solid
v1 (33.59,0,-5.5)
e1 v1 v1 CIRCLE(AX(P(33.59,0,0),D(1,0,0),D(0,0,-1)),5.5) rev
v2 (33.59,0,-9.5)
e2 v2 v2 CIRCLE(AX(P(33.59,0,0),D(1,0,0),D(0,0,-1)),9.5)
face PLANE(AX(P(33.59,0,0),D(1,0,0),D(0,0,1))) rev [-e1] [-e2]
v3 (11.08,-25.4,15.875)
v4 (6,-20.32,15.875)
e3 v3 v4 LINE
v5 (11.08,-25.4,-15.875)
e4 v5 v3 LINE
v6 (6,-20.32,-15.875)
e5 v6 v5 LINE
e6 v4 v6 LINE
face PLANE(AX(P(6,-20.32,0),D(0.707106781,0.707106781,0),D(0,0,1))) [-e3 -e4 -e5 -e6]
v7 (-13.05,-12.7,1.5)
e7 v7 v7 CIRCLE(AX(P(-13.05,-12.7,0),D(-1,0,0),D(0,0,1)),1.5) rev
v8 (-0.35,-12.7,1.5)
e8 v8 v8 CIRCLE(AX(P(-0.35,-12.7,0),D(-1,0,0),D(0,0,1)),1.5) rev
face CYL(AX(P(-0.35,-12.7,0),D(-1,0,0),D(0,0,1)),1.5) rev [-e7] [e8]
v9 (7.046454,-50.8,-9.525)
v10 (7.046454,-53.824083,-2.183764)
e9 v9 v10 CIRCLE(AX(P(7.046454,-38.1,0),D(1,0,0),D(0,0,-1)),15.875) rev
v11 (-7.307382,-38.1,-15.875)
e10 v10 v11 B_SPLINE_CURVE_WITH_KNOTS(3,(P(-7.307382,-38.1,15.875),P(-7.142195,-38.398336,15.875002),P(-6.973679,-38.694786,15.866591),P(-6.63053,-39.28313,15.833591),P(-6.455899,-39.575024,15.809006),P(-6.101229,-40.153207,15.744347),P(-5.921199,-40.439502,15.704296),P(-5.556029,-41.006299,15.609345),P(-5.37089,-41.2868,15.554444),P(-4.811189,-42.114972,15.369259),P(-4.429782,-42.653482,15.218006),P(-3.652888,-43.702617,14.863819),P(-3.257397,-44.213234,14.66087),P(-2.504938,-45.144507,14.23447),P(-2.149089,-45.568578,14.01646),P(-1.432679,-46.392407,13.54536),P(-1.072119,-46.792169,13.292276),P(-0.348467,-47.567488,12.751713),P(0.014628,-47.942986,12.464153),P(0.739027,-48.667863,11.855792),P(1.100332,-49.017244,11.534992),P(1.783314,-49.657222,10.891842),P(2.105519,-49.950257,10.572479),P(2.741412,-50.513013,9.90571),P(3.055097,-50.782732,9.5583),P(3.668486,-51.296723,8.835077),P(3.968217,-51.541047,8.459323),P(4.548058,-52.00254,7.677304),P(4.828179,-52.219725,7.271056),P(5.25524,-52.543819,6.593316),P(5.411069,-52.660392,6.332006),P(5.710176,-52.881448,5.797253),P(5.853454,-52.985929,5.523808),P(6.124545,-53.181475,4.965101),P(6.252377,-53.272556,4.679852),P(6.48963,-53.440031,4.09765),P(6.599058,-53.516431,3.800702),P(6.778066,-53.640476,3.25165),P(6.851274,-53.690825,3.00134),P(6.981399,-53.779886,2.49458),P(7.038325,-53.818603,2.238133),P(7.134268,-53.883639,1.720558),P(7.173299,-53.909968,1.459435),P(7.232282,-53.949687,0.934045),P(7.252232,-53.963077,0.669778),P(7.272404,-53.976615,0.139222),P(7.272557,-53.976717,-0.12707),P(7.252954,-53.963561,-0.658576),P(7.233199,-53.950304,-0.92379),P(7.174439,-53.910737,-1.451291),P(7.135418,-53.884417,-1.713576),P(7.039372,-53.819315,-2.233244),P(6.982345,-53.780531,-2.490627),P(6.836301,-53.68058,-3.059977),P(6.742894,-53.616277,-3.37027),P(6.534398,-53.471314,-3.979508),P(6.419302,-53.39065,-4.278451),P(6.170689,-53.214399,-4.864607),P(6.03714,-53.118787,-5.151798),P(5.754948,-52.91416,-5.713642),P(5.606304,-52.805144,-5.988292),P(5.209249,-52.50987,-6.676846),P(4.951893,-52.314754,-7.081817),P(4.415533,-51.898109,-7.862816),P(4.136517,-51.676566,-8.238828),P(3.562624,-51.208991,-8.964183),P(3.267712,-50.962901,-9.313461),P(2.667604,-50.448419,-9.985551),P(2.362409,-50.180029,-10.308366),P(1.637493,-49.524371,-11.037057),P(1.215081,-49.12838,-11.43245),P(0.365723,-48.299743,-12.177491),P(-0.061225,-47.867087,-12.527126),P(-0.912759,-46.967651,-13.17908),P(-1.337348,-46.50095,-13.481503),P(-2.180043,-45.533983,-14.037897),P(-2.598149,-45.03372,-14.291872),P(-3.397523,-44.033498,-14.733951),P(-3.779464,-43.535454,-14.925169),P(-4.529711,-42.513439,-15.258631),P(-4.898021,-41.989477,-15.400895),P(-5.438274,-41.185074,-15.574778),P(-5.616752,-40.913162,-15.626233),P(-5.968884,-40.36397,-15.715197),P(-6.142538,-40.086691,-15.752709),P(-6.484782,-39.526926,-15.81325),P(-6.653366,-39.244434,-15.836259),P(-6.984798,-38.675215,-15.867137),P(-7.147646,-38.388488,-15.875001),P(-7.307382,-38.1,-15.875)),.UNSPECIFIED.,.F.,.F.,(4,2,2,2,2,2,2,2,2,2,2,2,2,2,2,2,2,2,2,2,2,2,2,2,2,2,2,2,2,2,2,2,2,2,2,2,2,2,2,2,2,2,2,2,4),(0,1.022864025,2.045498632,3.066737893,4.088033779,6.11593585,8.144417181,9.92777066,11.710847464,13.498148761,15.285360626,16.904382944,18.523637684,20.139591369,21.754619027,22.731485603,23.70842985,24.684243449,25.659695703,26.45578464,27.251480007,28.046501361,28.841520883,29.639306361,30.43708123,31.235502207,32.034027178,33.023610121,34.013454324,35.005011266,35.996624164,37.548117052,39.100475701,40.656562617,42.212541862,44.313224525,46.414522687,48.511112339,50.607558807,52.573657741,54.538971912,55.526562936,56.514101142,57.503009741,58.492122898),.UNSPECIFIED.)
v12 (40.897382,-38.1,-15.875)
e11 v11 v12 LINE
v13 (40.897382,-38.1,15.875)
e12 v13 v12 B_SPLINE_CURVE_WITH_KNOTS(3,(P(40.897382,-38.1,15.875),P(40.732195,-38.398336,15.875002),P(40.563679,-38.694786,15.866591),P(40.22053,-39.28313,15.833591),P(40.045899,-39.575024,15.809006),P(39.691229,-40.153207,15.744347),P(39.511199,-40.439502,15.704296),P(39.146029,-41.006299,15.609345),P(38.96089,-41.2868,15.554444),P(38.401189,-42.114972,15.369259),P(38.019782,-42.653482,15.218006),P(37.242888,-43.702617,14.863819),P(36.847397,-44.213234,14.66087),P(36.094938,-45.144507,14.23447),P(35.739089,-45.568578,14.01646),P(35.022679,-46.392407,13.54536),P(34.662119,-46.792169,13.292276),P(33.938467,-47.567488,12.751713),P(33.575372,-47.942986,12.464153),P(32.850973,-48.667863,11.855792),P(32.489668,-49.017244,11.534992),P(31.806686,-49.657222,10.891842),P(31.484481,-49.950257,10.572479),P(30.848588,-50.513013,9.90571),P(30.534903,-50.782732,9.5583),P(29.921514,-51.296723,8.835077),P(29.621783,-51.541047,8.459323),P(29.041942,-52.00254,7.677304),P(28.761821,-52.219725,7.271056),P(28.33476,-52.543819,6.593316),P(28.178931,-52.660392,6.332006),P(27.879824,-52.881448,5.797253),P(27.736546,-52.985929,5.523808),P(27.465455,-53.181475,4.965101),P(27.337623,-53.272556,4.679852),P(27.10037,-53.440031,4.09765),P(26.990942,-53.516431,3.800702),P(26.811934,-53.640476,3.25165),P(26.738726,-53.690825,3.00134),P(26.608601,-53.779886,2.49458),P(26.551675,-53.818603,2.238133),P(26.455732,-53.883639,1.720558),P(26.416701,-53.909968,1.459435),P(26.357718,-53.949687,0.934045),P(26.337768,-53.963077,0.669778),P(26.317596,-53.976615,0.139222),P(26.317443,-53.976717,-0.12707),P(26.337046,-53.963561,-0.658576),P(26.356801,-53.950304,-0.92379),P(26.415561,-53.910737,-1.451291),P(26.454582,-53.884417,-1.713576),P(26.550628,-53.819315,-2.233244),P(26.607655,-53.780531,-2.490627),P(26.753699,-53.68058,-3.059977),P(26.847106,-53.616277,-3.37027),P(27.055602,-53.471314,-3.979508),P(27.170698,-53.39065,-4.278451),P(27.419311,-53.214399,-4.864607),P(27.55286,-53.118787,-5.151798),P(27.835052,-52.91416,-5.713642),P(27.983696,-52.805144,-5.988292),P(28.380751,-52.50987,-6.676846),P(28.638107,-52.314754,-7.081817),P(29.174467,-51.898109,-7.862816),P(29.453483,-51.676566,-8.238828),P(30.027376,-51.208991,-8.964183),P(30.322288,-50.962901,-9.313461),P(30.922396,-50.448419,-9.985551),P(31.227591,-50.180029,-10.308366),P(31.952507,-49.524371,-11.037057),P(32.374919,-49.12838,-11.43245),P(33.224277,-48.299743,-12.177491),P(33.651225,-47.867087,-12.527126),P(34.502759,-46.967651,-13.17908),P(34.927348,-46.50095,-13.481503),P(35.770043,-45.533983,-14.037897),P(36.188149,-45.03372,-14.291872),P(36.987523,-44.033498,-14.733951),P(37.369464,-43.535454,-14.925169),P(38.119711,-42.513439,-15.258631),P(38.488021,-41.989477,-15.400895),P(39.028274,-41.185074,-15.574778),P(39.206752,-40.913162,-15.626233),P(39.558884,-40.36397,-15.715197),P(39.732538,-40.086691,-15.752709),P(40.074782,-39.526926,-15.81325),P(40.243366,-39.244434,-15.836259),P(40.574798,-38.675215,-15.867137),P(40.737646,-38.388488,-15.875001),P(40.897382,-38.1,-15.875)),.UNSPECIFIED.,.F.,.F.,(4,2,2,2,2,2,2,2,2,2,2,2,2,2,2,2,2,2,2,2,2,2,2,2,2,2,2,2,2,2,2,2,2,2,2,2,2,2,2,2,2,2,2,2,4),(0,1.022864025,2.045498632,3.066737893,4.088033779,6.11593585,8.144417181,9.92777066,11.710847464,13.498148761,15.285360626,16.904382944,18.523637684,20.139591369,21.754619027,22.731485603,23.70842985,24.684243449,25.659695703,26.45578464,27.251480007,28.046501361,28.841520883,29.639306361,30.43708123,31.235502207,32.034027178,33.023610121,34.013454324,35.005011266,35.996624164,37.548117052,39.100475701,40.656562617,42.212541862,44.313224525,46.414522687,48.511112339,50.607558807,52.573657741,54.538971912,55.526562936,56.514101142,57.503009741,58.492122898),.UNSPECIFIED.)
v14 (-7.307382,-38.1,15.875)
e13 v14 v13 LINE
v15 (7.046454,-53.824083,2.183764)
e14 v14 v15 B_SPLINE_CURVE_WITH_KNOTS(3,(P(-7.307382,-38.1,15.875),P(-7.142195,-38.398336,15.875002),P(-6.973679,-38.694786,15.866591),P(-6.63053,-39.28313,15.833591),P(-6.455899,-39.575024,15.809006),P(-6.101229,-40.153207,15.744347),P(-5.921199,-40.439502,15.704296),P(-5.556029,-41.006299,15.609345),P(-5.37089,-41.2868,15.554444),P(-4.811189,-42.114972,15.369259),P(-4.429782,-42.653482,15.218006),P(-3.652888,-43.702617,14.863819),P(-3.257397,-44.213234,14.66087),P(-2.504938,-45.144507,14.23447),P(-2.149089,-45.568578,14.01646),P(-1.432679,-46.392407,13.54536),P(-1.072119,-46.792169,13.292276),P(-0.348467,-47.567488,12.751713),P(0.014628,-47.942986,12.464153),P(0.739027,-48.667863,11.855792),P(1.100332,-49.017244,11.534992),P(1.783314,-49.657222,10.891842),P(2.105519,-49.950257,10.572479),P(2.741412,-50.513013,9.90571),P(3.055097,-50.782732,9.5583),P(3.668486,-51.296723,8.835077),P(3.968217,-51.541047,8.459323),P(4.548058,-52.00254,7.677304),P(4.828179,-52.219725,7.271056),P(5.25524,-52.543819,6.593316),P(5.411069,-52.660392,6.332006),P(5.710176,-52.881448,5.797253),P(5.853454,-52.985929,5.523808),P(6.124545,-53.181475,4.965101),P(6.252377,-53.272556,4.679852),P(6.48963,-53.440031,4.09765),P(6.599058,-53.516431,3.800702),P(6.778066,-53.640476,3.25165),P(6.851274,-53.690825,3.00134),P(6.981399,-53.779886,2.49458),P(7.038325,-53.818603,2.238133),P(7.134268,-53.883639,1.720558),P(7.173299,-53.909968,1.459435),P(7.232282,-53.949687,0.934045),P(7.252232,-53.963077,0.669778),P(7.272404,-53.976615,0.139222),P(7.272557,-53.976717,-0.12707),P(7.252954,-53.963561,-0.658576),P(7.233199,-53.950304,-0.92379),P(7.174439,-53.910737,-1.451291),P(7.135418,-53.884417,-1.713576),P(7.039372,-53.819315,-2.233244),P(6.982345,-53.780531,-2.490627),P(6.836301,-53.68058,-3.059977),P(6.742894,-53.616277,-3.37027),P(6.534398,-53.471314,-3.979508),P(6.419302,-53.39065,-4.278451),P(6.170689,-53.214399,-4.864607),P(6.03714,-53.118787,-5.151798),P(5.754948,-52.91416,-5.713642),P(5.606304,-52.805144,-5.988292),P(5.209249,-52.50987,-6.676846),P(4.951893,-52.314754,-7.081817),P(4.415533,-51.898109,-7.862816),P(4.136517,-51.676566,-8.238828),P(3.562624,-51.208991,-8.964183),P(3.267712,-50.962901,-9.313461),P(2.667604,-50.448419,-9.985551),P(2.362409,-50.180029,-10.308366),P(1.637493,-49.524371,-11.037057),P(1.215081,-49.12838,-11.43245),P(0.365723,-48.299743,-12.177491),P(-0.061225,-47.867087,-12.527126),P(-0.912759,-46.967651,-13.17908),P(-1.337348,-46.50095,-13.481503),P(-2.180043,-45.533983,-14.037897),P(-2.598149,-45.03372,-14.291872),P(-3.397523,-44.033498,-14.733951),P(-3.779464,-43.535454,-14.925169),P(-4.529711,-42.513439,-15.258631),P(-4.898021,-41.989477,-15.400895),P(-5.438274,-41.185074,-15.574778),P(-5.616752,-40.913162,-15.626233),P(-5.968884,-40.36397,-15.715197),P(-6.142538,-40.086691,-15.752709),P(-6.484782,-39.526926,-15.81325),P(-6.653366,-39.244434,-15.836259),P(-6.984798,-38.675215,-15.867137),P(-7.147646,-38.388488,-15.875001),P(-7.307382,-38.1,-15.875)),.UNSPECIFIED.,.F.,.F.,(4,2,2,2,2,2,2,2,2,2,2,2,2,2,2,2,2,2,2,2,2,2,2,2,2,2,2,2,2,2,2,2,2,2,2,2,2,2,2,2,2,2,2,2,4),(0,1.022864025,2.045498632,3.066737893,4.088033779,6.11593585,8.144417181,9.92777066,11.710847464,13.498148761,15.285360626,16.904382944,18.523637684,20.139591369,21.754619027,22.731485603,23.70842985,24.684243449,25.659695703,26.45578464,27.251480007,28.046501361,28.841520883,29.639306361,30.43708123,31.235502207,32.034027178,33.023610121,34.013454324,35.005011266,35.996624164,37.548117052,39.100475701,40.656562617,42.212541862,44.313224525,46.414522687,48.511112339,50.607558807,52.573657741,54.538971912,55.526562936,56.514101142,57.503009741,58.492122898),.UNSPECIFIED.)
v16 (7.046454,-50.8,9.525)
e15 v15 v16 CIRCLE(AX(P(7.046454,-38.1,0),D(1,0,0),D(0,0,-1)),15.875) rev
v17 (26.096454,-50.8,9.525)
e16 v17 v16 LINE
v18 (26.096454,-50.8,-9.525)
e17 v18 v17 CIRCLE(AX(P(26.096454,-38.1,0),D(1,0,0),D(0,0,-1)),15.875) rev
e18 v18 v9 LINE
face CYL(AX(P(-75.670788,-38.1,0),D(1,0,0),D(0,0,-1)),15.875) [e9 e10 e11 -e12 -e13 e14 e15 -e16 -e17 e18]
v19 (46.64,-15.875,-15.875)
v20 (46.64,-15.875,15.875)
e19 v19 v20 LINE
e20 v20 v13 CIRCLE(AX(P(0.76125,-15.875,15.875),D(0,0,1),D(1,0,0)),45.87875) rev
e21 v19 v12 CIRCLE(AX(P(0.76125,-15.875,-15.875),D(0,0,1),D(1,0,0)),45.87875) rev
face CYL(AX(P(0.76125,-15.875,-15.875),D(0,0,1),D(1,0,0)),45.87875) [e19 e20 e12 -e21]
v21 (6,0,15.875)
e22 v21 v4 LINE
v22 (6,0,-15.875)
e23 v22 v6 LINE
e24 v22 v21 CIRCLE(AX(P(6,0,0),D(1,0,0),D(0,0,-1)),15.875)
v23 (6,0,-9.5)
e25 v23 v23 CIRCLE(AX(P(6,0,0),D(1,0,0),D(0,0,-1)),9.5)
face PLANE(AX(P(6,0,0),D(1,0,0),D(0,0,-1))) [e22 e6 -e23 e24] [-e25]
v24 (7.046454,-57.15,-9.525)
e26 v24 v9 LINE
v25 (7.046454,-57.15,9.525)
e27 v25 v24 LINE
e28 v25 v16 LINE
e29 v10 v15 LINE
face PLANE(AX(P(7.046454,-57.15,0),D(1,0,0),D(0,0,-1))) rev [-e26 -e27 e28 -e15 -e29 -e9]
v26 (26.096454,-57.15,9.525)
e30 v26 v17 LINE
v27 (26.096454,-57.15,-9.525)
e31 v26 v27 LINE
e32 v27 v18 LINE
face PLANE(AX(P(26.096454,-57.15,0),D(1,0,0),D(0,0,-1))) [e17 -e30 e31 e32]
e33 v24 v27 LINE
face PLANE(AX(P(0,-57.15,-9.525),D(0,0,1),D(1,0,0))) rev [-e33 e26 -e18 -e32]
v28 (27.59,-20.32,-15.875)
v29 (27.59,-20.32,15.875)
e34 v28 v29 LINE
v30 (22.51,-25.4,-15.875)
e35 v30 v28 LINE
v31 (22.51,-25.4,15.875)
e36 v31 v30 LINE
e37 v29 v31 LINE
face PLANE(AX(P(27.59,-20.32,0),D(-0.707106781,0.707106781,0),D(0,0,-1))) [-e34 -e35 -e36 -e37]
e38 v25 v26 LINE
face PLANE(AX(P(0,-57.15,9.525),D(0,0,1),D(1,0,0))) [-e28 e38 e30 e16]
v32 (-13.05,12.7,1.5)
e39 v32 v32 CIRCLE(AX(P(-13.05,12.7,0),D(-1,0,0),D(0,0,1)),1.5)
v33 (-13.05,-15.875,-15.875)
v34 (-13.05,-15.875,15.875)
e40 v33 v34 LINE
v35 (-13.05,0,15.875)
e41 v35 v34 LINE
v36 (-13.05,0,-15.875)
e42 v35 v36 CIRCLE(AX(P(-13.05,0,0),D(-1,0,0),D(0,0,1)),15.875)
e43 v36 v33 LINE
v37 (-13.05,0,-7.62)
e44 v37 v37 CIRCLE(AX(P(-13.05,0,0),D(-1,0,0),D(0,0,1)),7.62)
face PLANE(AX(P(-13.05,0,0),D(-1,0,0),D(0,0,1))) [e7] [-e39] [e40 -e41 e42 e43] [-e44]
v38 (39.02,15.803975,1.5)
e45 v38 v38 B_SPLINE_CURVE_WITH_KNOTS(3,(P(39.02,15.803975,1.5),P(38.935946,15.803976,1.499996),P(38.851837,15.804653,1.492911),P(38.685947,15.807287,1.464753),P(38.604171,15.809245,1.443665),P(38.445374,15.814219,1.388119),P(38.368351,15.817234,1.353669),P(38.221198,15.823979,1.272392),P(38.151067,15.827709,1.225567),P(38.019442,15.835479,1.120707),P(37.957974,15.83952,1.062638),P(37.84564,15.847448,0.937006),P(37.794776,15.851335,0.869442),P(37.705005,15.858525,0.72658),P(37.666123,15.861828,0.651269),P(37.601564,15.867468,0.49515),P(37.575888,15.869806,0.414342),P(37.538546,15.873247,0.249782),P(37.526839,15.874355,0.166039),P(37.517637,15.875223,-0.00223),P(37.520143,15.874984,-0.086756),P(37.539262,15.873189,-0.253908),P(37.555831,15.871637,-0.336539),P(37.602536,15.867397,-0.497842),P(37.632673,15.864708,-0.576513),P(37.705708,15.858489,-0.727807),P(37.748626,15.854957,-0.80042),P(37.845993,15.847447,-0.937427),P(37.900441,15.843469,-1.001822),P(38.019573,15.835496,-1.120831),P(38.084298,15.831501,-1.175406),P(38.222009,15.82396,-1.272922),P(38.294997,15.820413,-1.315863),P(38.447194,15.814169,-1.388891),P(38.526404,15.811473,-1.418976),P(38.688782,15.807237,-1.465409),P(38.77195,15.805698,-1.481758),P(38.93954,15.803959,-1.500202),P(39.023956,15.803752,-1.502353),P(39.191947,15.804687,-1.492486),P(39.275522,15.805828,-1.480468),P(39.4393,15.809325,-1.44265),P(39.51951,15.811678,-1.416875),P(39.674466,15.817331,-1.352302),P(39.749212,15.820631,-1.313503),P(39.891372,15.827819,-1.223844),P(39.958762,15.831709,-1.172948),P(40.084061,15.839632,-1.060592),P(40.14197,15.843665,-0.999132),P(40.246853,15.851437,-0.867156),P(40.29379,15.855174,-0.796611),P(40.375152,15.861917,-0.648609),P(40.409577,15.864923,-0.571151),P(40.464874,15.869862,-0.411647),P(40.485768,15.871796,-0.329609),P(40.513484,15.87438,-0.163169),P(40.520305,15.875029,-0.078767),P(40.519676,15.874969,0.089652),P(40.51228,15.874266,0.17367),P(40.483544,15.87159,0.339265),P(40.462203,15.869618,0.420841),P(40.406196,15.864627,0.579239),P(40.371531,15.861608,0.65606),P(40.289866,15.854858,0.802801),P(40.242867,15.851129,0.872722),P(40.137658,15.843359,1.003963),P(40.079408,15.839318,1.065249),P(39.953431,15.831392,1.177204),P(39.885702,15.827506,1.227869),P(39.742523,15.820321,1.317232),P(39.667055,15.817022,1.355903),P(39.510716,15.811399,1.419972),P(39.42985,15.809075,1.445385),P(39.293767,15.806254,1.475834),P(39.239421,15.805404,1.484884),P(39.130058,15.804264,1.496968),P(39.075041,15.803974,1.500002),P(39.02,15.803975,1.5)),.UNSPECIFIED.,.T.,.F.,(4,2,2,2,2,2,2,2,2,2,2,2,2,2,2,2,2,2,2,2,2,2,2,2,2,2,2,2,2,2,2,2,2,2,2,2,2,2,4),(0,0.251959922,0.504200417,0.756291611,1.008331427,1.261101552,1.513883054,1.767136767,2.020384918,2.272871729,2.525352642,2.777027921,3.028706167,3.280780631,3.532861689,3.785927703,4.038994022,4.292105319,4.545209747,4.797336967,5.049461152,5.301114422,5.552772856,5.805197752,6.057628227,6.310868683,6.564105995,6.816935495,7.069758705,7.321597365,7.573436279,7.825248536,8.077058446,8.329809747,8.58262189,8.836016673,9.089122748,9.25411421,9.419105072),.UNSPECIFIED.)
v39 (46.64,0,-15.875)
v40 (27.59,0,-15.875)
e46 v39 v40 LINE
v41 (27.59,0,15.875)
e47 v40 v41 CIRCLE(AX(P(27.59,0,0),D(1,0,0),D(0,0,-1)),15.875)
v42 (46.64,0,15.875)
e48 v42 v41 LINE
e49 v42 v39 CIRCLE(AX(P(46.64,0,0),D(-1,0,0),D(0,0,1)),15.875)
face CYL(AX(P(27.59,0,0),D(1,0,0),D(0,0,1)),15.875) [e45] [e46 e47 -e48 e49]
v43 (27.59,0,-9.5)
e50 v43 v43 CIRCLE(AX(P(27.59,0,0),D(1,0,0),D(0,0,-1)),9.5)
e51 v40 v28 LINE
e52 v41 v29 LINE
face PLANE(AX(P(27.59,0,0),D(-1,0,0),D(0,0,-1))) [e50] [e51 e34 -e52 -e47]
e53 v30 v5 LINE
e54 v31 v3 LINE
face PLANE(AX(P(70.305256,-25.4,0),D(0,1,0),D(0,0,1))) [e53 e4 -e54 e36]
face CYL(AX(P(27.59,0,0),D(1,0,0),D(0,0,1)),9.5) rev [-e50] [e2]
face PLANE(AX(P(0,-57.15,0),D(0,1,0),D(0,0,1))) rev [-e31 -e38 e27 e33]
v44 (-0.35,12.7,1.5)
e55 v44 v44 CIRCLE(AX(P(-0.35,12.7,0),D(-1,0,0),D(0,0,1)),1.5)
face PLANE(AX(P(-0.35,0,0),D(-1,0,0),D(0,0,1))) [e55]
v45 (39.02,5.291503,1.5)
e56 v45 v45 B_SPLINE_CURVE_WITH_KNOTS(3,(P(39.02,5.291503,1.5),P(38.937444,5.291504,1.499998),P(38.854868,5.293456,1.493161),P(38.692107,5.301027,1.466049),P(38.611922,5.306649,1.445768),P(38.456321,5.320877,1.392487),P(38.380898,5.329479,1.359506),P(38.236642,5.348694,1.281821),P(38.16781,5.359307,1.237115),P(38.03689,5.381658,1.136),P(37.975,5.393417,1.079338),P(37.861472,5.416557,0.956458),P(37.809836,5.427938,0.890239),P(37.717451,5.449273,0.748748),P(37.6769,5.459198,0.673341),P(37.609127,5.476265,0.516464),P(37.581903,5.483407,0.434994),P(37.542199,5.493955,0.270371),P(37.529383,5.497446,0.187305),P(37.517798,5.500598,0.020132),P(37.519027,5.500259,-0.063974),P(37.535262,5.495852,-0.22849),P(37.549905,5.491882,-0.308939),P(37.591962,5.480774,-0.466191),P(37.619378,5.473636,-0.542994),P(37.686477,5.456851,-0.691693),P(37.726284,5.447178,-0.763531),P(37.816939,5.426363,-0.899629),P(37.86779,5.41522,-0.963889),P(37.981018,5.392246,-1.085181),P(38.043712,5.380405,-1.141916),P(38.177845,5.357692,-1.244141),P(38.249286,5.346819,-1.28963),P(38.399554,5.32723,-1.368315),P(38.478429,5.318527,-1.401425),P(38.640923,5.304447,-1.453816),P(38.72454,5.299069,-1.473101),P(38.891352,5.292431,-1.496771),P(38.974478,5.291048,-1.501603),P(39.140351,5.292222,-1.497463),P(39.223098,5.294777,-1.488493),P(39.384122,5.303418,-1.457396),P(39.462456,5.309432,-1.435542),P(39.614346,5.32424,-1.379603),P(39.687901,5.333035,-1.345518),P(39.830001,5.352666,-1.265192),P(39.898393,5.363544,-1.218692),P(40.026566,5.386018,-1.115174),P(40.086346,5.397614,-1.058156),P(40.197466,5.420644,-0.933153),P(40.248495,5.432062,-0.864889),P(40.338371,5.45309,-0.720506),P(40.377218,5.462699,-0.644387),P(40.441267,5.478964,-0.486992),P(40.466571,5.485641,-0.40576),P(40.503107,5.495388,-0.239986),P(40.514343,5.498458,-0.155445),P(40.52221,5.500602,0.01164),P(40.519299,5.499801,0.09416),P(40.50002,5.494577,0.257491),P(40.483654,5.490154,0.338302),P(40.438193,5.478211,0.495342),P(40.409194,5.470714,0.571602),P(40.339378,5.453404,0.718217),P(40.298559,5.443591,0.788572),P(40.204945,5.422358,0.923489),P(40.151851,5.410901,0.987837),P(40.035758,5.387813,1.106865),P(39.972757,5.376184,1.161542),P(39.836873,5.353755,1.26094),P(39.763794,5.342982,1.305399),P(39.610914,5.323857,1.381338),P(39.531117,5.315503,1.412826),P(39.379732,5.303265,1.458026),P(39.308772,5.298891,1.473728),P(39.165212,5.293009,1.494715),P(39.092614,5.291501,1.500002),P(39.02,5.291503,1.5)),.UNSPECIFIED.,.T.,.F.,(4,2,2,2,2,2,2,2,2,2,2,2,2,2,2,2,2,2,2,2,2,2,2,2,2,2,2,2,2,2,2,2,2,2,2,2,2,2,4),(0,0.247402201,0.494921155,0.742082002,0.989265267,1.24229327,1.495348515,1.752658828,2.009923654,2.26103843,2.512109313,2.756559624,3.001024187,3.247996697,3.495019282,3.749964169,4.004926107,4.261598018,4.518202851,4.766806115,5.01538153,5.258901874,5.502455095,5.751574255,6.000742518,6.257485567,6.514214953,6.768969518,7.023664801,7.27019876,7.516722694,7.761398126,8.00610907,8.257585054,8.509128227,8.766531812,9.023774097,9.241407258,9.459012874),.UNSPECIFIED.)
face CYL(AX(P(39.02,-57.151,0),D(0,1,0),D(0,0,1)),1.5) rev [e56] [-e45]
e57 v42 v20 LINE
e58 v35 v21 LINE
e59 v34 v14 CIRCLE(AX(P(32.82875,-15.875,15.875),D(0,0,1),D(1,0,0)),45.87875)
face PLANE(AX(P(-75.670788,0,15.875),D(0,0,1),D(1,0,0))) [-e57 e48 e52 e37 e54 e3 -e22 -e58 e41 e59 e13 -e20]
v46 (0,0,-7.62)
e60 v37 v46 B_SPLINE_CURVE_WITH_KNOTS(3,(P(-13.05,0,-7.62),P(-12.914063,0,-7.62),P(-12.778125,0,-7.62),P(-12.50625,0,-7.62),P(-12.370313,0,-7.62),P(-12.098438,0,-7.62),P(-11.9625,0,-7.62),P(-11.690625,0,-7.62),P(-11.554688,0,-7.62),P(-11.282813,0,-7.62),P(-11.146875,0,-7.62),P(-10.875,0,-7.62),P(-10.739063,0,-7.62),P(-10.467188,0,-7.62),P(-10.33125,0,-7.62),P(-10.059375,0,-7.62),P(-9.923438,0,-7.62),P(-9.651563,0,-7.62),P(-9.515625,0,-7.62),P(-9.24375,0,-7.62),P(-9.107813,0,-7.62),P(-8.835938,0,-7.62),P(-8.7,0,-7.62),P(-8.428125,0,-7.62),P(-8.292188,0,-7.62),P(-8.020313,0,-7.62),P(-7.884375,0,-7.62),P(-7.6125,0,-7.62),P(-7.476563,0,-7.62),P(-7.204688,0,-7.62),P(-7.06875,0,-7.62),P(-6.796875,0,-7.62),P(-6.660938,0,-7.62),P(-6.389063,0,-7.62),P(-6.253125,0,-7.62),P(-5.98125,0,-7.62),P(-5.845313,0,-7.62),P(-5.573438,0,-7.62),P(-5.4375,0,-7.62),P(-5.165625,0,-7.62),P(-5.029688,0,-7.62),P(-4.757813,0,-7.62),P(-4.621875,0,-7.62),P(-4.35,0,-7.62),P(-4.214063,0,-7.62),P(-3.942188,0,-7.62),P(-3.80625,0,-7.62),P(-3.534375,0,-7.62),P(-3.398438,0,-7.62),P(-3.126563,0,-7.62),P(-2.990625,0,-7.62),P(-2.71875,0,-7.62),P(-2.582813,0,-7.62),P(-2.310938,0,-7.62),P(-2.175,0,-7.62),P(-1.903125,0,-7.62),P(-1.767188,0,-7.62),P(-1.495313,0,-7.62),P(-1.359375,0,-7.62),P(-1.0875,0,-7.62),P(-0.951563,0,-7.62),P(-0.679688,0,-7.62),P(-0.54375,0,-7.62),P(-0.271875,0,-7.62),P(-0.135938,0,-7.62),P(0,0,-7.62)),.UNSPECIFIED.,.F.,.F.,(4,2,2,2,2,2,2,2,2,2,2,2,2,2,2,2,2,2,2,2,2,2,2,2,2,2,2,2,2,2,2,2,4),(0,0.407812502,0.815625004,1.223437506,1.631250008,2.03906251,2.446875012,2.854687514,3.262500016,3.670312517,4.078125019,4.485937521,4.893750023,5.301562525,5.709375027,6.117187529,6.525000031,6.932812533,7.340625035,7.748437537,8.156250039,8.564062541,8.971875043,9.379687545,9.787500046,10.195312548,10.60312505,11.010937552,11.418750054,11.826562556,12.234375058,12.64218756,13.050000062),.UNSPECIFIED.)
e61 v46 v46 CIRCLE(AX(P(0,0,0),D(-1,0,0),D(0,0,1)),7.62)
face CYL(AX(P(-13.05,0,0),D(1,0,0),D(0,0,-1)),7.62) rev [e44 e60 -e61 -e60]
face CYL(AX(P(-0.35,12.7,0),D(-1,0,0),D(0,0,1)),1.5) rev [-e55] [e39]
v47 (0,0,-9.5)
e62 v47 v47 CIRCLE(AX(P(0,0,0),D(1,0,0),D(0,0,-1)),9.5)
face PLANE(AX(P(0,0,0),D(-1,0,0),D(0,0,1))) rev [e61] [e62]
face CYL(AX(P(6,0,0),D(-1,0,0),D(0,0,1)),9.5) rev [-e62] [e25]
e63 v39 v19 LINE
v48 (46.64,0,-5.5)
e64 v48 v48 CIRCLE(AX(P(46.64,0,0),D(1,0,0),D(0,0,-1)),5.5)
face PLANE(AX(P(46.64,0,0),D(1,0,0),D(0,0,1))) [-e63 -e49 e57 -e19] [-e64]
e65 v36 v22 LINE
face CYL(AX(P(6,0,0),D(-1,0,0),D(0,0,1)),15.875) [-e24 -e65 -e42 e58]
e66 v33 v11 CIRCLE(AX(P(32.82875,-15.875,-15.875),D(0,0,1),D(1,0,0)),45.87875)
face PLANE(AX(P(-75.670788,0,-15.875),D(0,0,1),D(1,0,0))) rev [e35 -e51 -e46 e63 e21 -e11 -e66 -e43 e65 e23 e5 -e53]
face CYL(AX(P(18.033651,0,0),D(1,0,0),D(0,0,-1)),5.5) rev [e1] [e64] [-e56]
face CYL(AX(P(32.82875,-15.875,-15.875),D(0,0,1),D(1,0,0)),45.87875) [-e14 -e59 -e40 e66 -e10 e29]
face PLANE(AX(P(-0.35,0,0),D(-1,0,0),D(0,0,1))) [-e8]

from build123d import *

# Parameters (mm, degrees)
SKETCH1_R               = 15.875
SKETCH1_R_2             = 9.5
BOSS_EXTRUDE1_DEPTH     = 6
BOSS_EXTRUDE2_START     = 13.050000062
SKETCH2_R               = 15.875
SKETCH2_R_2             = 9.5
SKETCH2_R_3             = 7.62
BOSS_EXTRUDE2_DEPTH     = 13.050000062
BOSS_EXTRUDE3_START     = -19.050000062
BOSS_EXTRUDE3_DEPTH     = 19.050000062
BOSS_EXTRUDE4_START     = 21.59
BOSS_EXTRUDE4_DEPTH     = 19.050000062
BOSS_EXTRUDE5_REACH     = 71.404
CUT_EXTRUDE1_START      = -31.75
CUT_EXTRUDE1_DEPTH      = 31.75
SKETCH9_W               = 19.05
SKETCH9_H               = 19.05
BOSS_EXTRUDE8_DEPTH     = 31.75
CHAMFER1_SIZE           = 5.08
SKETCH6_R               = 7.62
SKETCH6_R_2             = 5.25
BOSS_EXTRUDE6_DEPTH     = 13.050000062
SKETCH7_R               = 1.5
CUT_EXTRUDE2_DEPTH      = 12.7
CUT_EXTRUDE3_REACH      = 90.091
CUT_EXTRUDE3_END_RADIUS = 5.25
SKETCH8_R               = 1.5
CUT_EXTRUDE4_REACH      = 86.149
SKETCH10_R              = 5.5
SKETCH10_R_2            = 5.25


# Read off the part's stored shape, not the designer's step: Cut-Extrude1
with BuildPart() as part:
    # Sketch1 → Boss-Extrude1 (new body)
    with BuildSketch(Plane(origin=(0, 0, 0), x_dir=(0, 0, -1), z_dir=(1, 0, 0))):
        Circle(SKETCH1_R)
        Circle(SKETCH1_R_2, mode=Mode.SUBTRACT)
    extrude(amount=BOSS_EXTRUDE1_DEPTH)

    # Sketch2 → Boss-Extrude2 (add)
    # profile 1 of 2: a face of its own
    with BuildSketch(Plane.ZY.offset(BOSS_EXTRUDE2_START)):
        Circle(SKETCH2_R)
        with Locations(Location((0, 0, 0), (0, 0, 180))):
            Circle(SKETCH2_R_2, mode=Mode.SUBTRACT)
    # profile 2 of 2: a face of its own
    with BuildSketch(Plane.ZY.offset(BOSS_EXTRUDE2_START)):
        with Locations(Location((0, 0, 0), (0, 0, 180))):
            Circle(SKETCH2_R_2)
        with Locations(Location((0, 0, 0), (0, 0, 180))):
            Circle(SKETCH2_R_3, mode=Mode.SUBTRACT)
    extrude(amount=-BOSS_EXTRUDE2_DEPTH)


with BuildPart() as body_2:
    # Mirror2: mirrored copy
    add(part.part.mirror(Plane(origin=(16.795, 0, 0), x_dir=(0, 0, 1), z_dir=(1, 0, 0))))

    # Sketch3<3> → Boss-Extrude4 (add)
    with BuildSketch(Plane(origin=(6, 0, 0), x_dir=(0, 0, -1), z_dir=(1, 0, 0)).offset(BOSS_EXTRUDE4_START)):
        with BuildLine():
            ThreePointArc((15.875, 0), (0, -15.875), (-15.875, 0))
            Line((-15.875, 0), (-15.875, -38.1))
            ThreePointArc((-15.875, -38.1), (0, -53.975), (15.875, -38.1))
            Line((15.875, -38.1), (15.875, 0))
        make_face()
    extrude(amount=BOSS_EXTRUDE4_DEPTH)

    # Sketch4 → Boss-Extrude5 (add, up to next)
    with BuildSketch(Plane(origin=(6, 0, 0), x_dir=(0, 0, -1), z_dir=(1, 0, 0)), mode=Mode.PRIVATE) as boss_extrude5_sk1:
        with BuildLine():
            Line((15.875, -25.4), (-15.875, -25.4))
            Line((-15.875, -25.4), (-15.875, -38.1))
            ThreePointArc((-15.875, -38.1), (0, -53.975), (15.875, -38.1))
            Line((15.875, -38.1), (15.875, -25.4))
        make_face()
    boss_extrude5_tool1 = extrude(boss_extrude5_sk1.sketch, amount=BOSS_EXTRUDE5_REACH, mode=Mode.PRIVATE) - body_2.part


with BuildPart() as part_1:
    add(part.part)

    # Sketch3 → Boss-Extrude3 (add)
    with BuildSketch(Plane(origin=(6, 0, 0), x_dir=(0, 0, -1), z_dir=(1, 0, 0)).offset(BOSS_EXTRUDE3_START)):
        with BuildLine():
            ThreePointArc((15.875, 0), (0, -15.875), (-15.875, 0))
            Line((-15.875, 0), (-15.875, -38.1))
            ThreePointArc((-15.875, -38.1), (0, -53.975), (15.875, -38.1))
            Line((15.875, -38.1), (15.875, 0))
        make_face()
    extrude(amount=BOSS_EXTRUDE3_DEPTH)


with BuildPart() as body_2_1:
    add(body_2.part)

    add(part_1.part)  # Boss-Extrude5 merges part
    add(boss_extrude5_tool1.solids().sort_by_distance((6, -38.23351, 0))[0])

    # Cut-Extrude1 outline → Cut-Extrude1 (cut)
    with BuildSketch(Plane.XY.offset(15.875).offset(CUT_EXTRUDE1_START)):
        with BuildLine():
            Line((-13.050000062, -15.875), (-13.050000062, -53.975))
            Line((-13.050000062, -53.975), (7.27, -53.975))
            ThreePointArc((7.27, -53.975), (-7.652500044, -37.465000015), (-13.050000062, -15.875))
        make_face()
        with BuildLine():
            ThreePointArc((46.640000062, -15.875), (41.242500044, -37.465000015), (26.32, -53.975))
            Line((26.32, -53.975), (46.640000062, -53.975))
            Line((46.640000062, -53.975), (46.640000062, -15.875))
        make_face()
    extrude(amount=CUT_EXTRUDE1_DEPTH, mode=Mode.SUBTRACT)

    # Sketch9 → Boss-Extrude8 (add)
    with BuildSketch(Plane(origin=(0, -25.4, 0), x_dir=(1, 0, 0), z_dir=(0, 1, 0))):
        with Locations((16.571454424, 0)):
            Rectangle(SKETCH9_W, SKETCH9_H)
    extrude(amount=-BOSS_EXTRUDE8_DEPTH)

    # Chamfer1
    chamfer1_edges = [body_2_1.edges().sort_by_distance(p)[0] for p in [
        (6, -25.4, 0),
        (27.59, -25.4, 0),
    ]]
    chamfer(chamfer1_edges, length=CHAMFER1_SIZE)

    # Sketch6 → Boss-Extrude6 (add)
    with BuildSketch(Plane(origin=(46.640000062, 0, 0), x_dir=(0, 0, -1), z_dir=(1, 0, 0))):
        Circle(SKETCH6_R)
        Circle(SKETCH6_R_2, mode=Mode.SUBTRACT)
    extrude(amount=-BOSS_EXTRUDE6_DEPTH)

    # Sketch7 → Cut-Extrude2 (cut)
    with BuildSketch(Plane.ZY.offset(13.050000062)):
        with Locations((0, 12.7)):
            Circle(SKETCH7_R)
        with Locations((0, -12.7)):
            Circle(SKETCH7_R)
    extrude(amount=-CUT_EXTRUDE2_DEPTH, mode=Mode.SUBTRACT)

    # Cut-Extrude3: up to this cylinder (the profile starts outside it)
    cut_extrude3_end = Plane(origin=(39.02, 0, 0), z_dir=(1, 0, 0)) * Cylinder(CUT_EXTRUDE3_END_RADIUS, 191.682, mode=Mode.PRIVATE)
    # Sketch8 → Cut-Extrude3 (cut, up to the surface)
    with BuildSketch(Plane(origin=(0, 15.875, 0), x_dir=(1, 0, 0), z_dir=(0, 1, 0)), mode=Mode.PRIVATE) as cut_extrude3_sk1:
        with Locations(Location((39.020000062, 0, 0), (0, 0, 270))):
            Circle(SKETCH8_R)
    cut_extrude3_tool1 = extrude(cut_extrude3_sk1.sketch, amount=-CUT_EXTRUDE3_REACH, mode=Mode.PRIVATE) - cut_extrude3_end
    add(cut_extrude3_tool1.solids().sort_by_distance((39.02, 15.875, 0))[0], mode=Mode.SUBTRACT)

    # Cut-Extrude4: up to this face of the body (flat: up to its plane)
    cut_extrude4_end = Plane(body_2_1.part.faces().sort_by_distance((33.59, 0, 9.231299423))[0])
    # Sketch10 → Cut-Extrude4 (cut, up to the picked face)
    with BuildSketch(Plane(origin=(46.640000062, 0, 0), x_dir=(0, 0, -1), z_dir=(1, 0, 0)), mode=Mode.PRIVATE) as cut_extrude4_sk1:
        Circle(SKETCH10_R)
        Circle(SKETCH10_R_2, mode=Mode.SUBTRACT)
    cut_extrude4_tool1 = split(extrude(cut_extrude4_sk1.sketch, amount=-CUT_EXTRUDE4_REACH, mode=Mode.PRIVATE), bisect_by=cut_extrude4_end, keep=Keep.BOTH, mode=Mode.PRIVATE)
    # Sketch10 → Cut-Extrude4 (cut, up to the picked face)
    with BuildSketch(Plane(origin=(46.640000062, 0, 0), x_dir=(0, 0, -1), z_dir=(1, 0, 0)), mode=Mode.PRIVATE) as cut_extrude4_sk2:
        Circle(SKETCH10_R_2)
    cut_extrude4_tool2 = split(extrude(cut_extrude4_sk2.sketch, amount=-CUT_EXTRUDE4_REACH, mode=Mode.PRIVATE), bisect_by=cut_extrude4_end, keep=Keep.BOTH, mode=Mode.PRIVATE)
    add(cut_extrude4_tool1.solids().sort_by(Axis((46.64, 0, 5.344437), (-1, 0, 0)))[0], mode=Mode.SUBTRACT)
    add(cut_extrude4_tool2.solids().sort_by(Axis((46.64, 0, 0), (-1, 0, 0)))[0], mode=Mode.SUBTRACT)


solid = body_2_1.part
